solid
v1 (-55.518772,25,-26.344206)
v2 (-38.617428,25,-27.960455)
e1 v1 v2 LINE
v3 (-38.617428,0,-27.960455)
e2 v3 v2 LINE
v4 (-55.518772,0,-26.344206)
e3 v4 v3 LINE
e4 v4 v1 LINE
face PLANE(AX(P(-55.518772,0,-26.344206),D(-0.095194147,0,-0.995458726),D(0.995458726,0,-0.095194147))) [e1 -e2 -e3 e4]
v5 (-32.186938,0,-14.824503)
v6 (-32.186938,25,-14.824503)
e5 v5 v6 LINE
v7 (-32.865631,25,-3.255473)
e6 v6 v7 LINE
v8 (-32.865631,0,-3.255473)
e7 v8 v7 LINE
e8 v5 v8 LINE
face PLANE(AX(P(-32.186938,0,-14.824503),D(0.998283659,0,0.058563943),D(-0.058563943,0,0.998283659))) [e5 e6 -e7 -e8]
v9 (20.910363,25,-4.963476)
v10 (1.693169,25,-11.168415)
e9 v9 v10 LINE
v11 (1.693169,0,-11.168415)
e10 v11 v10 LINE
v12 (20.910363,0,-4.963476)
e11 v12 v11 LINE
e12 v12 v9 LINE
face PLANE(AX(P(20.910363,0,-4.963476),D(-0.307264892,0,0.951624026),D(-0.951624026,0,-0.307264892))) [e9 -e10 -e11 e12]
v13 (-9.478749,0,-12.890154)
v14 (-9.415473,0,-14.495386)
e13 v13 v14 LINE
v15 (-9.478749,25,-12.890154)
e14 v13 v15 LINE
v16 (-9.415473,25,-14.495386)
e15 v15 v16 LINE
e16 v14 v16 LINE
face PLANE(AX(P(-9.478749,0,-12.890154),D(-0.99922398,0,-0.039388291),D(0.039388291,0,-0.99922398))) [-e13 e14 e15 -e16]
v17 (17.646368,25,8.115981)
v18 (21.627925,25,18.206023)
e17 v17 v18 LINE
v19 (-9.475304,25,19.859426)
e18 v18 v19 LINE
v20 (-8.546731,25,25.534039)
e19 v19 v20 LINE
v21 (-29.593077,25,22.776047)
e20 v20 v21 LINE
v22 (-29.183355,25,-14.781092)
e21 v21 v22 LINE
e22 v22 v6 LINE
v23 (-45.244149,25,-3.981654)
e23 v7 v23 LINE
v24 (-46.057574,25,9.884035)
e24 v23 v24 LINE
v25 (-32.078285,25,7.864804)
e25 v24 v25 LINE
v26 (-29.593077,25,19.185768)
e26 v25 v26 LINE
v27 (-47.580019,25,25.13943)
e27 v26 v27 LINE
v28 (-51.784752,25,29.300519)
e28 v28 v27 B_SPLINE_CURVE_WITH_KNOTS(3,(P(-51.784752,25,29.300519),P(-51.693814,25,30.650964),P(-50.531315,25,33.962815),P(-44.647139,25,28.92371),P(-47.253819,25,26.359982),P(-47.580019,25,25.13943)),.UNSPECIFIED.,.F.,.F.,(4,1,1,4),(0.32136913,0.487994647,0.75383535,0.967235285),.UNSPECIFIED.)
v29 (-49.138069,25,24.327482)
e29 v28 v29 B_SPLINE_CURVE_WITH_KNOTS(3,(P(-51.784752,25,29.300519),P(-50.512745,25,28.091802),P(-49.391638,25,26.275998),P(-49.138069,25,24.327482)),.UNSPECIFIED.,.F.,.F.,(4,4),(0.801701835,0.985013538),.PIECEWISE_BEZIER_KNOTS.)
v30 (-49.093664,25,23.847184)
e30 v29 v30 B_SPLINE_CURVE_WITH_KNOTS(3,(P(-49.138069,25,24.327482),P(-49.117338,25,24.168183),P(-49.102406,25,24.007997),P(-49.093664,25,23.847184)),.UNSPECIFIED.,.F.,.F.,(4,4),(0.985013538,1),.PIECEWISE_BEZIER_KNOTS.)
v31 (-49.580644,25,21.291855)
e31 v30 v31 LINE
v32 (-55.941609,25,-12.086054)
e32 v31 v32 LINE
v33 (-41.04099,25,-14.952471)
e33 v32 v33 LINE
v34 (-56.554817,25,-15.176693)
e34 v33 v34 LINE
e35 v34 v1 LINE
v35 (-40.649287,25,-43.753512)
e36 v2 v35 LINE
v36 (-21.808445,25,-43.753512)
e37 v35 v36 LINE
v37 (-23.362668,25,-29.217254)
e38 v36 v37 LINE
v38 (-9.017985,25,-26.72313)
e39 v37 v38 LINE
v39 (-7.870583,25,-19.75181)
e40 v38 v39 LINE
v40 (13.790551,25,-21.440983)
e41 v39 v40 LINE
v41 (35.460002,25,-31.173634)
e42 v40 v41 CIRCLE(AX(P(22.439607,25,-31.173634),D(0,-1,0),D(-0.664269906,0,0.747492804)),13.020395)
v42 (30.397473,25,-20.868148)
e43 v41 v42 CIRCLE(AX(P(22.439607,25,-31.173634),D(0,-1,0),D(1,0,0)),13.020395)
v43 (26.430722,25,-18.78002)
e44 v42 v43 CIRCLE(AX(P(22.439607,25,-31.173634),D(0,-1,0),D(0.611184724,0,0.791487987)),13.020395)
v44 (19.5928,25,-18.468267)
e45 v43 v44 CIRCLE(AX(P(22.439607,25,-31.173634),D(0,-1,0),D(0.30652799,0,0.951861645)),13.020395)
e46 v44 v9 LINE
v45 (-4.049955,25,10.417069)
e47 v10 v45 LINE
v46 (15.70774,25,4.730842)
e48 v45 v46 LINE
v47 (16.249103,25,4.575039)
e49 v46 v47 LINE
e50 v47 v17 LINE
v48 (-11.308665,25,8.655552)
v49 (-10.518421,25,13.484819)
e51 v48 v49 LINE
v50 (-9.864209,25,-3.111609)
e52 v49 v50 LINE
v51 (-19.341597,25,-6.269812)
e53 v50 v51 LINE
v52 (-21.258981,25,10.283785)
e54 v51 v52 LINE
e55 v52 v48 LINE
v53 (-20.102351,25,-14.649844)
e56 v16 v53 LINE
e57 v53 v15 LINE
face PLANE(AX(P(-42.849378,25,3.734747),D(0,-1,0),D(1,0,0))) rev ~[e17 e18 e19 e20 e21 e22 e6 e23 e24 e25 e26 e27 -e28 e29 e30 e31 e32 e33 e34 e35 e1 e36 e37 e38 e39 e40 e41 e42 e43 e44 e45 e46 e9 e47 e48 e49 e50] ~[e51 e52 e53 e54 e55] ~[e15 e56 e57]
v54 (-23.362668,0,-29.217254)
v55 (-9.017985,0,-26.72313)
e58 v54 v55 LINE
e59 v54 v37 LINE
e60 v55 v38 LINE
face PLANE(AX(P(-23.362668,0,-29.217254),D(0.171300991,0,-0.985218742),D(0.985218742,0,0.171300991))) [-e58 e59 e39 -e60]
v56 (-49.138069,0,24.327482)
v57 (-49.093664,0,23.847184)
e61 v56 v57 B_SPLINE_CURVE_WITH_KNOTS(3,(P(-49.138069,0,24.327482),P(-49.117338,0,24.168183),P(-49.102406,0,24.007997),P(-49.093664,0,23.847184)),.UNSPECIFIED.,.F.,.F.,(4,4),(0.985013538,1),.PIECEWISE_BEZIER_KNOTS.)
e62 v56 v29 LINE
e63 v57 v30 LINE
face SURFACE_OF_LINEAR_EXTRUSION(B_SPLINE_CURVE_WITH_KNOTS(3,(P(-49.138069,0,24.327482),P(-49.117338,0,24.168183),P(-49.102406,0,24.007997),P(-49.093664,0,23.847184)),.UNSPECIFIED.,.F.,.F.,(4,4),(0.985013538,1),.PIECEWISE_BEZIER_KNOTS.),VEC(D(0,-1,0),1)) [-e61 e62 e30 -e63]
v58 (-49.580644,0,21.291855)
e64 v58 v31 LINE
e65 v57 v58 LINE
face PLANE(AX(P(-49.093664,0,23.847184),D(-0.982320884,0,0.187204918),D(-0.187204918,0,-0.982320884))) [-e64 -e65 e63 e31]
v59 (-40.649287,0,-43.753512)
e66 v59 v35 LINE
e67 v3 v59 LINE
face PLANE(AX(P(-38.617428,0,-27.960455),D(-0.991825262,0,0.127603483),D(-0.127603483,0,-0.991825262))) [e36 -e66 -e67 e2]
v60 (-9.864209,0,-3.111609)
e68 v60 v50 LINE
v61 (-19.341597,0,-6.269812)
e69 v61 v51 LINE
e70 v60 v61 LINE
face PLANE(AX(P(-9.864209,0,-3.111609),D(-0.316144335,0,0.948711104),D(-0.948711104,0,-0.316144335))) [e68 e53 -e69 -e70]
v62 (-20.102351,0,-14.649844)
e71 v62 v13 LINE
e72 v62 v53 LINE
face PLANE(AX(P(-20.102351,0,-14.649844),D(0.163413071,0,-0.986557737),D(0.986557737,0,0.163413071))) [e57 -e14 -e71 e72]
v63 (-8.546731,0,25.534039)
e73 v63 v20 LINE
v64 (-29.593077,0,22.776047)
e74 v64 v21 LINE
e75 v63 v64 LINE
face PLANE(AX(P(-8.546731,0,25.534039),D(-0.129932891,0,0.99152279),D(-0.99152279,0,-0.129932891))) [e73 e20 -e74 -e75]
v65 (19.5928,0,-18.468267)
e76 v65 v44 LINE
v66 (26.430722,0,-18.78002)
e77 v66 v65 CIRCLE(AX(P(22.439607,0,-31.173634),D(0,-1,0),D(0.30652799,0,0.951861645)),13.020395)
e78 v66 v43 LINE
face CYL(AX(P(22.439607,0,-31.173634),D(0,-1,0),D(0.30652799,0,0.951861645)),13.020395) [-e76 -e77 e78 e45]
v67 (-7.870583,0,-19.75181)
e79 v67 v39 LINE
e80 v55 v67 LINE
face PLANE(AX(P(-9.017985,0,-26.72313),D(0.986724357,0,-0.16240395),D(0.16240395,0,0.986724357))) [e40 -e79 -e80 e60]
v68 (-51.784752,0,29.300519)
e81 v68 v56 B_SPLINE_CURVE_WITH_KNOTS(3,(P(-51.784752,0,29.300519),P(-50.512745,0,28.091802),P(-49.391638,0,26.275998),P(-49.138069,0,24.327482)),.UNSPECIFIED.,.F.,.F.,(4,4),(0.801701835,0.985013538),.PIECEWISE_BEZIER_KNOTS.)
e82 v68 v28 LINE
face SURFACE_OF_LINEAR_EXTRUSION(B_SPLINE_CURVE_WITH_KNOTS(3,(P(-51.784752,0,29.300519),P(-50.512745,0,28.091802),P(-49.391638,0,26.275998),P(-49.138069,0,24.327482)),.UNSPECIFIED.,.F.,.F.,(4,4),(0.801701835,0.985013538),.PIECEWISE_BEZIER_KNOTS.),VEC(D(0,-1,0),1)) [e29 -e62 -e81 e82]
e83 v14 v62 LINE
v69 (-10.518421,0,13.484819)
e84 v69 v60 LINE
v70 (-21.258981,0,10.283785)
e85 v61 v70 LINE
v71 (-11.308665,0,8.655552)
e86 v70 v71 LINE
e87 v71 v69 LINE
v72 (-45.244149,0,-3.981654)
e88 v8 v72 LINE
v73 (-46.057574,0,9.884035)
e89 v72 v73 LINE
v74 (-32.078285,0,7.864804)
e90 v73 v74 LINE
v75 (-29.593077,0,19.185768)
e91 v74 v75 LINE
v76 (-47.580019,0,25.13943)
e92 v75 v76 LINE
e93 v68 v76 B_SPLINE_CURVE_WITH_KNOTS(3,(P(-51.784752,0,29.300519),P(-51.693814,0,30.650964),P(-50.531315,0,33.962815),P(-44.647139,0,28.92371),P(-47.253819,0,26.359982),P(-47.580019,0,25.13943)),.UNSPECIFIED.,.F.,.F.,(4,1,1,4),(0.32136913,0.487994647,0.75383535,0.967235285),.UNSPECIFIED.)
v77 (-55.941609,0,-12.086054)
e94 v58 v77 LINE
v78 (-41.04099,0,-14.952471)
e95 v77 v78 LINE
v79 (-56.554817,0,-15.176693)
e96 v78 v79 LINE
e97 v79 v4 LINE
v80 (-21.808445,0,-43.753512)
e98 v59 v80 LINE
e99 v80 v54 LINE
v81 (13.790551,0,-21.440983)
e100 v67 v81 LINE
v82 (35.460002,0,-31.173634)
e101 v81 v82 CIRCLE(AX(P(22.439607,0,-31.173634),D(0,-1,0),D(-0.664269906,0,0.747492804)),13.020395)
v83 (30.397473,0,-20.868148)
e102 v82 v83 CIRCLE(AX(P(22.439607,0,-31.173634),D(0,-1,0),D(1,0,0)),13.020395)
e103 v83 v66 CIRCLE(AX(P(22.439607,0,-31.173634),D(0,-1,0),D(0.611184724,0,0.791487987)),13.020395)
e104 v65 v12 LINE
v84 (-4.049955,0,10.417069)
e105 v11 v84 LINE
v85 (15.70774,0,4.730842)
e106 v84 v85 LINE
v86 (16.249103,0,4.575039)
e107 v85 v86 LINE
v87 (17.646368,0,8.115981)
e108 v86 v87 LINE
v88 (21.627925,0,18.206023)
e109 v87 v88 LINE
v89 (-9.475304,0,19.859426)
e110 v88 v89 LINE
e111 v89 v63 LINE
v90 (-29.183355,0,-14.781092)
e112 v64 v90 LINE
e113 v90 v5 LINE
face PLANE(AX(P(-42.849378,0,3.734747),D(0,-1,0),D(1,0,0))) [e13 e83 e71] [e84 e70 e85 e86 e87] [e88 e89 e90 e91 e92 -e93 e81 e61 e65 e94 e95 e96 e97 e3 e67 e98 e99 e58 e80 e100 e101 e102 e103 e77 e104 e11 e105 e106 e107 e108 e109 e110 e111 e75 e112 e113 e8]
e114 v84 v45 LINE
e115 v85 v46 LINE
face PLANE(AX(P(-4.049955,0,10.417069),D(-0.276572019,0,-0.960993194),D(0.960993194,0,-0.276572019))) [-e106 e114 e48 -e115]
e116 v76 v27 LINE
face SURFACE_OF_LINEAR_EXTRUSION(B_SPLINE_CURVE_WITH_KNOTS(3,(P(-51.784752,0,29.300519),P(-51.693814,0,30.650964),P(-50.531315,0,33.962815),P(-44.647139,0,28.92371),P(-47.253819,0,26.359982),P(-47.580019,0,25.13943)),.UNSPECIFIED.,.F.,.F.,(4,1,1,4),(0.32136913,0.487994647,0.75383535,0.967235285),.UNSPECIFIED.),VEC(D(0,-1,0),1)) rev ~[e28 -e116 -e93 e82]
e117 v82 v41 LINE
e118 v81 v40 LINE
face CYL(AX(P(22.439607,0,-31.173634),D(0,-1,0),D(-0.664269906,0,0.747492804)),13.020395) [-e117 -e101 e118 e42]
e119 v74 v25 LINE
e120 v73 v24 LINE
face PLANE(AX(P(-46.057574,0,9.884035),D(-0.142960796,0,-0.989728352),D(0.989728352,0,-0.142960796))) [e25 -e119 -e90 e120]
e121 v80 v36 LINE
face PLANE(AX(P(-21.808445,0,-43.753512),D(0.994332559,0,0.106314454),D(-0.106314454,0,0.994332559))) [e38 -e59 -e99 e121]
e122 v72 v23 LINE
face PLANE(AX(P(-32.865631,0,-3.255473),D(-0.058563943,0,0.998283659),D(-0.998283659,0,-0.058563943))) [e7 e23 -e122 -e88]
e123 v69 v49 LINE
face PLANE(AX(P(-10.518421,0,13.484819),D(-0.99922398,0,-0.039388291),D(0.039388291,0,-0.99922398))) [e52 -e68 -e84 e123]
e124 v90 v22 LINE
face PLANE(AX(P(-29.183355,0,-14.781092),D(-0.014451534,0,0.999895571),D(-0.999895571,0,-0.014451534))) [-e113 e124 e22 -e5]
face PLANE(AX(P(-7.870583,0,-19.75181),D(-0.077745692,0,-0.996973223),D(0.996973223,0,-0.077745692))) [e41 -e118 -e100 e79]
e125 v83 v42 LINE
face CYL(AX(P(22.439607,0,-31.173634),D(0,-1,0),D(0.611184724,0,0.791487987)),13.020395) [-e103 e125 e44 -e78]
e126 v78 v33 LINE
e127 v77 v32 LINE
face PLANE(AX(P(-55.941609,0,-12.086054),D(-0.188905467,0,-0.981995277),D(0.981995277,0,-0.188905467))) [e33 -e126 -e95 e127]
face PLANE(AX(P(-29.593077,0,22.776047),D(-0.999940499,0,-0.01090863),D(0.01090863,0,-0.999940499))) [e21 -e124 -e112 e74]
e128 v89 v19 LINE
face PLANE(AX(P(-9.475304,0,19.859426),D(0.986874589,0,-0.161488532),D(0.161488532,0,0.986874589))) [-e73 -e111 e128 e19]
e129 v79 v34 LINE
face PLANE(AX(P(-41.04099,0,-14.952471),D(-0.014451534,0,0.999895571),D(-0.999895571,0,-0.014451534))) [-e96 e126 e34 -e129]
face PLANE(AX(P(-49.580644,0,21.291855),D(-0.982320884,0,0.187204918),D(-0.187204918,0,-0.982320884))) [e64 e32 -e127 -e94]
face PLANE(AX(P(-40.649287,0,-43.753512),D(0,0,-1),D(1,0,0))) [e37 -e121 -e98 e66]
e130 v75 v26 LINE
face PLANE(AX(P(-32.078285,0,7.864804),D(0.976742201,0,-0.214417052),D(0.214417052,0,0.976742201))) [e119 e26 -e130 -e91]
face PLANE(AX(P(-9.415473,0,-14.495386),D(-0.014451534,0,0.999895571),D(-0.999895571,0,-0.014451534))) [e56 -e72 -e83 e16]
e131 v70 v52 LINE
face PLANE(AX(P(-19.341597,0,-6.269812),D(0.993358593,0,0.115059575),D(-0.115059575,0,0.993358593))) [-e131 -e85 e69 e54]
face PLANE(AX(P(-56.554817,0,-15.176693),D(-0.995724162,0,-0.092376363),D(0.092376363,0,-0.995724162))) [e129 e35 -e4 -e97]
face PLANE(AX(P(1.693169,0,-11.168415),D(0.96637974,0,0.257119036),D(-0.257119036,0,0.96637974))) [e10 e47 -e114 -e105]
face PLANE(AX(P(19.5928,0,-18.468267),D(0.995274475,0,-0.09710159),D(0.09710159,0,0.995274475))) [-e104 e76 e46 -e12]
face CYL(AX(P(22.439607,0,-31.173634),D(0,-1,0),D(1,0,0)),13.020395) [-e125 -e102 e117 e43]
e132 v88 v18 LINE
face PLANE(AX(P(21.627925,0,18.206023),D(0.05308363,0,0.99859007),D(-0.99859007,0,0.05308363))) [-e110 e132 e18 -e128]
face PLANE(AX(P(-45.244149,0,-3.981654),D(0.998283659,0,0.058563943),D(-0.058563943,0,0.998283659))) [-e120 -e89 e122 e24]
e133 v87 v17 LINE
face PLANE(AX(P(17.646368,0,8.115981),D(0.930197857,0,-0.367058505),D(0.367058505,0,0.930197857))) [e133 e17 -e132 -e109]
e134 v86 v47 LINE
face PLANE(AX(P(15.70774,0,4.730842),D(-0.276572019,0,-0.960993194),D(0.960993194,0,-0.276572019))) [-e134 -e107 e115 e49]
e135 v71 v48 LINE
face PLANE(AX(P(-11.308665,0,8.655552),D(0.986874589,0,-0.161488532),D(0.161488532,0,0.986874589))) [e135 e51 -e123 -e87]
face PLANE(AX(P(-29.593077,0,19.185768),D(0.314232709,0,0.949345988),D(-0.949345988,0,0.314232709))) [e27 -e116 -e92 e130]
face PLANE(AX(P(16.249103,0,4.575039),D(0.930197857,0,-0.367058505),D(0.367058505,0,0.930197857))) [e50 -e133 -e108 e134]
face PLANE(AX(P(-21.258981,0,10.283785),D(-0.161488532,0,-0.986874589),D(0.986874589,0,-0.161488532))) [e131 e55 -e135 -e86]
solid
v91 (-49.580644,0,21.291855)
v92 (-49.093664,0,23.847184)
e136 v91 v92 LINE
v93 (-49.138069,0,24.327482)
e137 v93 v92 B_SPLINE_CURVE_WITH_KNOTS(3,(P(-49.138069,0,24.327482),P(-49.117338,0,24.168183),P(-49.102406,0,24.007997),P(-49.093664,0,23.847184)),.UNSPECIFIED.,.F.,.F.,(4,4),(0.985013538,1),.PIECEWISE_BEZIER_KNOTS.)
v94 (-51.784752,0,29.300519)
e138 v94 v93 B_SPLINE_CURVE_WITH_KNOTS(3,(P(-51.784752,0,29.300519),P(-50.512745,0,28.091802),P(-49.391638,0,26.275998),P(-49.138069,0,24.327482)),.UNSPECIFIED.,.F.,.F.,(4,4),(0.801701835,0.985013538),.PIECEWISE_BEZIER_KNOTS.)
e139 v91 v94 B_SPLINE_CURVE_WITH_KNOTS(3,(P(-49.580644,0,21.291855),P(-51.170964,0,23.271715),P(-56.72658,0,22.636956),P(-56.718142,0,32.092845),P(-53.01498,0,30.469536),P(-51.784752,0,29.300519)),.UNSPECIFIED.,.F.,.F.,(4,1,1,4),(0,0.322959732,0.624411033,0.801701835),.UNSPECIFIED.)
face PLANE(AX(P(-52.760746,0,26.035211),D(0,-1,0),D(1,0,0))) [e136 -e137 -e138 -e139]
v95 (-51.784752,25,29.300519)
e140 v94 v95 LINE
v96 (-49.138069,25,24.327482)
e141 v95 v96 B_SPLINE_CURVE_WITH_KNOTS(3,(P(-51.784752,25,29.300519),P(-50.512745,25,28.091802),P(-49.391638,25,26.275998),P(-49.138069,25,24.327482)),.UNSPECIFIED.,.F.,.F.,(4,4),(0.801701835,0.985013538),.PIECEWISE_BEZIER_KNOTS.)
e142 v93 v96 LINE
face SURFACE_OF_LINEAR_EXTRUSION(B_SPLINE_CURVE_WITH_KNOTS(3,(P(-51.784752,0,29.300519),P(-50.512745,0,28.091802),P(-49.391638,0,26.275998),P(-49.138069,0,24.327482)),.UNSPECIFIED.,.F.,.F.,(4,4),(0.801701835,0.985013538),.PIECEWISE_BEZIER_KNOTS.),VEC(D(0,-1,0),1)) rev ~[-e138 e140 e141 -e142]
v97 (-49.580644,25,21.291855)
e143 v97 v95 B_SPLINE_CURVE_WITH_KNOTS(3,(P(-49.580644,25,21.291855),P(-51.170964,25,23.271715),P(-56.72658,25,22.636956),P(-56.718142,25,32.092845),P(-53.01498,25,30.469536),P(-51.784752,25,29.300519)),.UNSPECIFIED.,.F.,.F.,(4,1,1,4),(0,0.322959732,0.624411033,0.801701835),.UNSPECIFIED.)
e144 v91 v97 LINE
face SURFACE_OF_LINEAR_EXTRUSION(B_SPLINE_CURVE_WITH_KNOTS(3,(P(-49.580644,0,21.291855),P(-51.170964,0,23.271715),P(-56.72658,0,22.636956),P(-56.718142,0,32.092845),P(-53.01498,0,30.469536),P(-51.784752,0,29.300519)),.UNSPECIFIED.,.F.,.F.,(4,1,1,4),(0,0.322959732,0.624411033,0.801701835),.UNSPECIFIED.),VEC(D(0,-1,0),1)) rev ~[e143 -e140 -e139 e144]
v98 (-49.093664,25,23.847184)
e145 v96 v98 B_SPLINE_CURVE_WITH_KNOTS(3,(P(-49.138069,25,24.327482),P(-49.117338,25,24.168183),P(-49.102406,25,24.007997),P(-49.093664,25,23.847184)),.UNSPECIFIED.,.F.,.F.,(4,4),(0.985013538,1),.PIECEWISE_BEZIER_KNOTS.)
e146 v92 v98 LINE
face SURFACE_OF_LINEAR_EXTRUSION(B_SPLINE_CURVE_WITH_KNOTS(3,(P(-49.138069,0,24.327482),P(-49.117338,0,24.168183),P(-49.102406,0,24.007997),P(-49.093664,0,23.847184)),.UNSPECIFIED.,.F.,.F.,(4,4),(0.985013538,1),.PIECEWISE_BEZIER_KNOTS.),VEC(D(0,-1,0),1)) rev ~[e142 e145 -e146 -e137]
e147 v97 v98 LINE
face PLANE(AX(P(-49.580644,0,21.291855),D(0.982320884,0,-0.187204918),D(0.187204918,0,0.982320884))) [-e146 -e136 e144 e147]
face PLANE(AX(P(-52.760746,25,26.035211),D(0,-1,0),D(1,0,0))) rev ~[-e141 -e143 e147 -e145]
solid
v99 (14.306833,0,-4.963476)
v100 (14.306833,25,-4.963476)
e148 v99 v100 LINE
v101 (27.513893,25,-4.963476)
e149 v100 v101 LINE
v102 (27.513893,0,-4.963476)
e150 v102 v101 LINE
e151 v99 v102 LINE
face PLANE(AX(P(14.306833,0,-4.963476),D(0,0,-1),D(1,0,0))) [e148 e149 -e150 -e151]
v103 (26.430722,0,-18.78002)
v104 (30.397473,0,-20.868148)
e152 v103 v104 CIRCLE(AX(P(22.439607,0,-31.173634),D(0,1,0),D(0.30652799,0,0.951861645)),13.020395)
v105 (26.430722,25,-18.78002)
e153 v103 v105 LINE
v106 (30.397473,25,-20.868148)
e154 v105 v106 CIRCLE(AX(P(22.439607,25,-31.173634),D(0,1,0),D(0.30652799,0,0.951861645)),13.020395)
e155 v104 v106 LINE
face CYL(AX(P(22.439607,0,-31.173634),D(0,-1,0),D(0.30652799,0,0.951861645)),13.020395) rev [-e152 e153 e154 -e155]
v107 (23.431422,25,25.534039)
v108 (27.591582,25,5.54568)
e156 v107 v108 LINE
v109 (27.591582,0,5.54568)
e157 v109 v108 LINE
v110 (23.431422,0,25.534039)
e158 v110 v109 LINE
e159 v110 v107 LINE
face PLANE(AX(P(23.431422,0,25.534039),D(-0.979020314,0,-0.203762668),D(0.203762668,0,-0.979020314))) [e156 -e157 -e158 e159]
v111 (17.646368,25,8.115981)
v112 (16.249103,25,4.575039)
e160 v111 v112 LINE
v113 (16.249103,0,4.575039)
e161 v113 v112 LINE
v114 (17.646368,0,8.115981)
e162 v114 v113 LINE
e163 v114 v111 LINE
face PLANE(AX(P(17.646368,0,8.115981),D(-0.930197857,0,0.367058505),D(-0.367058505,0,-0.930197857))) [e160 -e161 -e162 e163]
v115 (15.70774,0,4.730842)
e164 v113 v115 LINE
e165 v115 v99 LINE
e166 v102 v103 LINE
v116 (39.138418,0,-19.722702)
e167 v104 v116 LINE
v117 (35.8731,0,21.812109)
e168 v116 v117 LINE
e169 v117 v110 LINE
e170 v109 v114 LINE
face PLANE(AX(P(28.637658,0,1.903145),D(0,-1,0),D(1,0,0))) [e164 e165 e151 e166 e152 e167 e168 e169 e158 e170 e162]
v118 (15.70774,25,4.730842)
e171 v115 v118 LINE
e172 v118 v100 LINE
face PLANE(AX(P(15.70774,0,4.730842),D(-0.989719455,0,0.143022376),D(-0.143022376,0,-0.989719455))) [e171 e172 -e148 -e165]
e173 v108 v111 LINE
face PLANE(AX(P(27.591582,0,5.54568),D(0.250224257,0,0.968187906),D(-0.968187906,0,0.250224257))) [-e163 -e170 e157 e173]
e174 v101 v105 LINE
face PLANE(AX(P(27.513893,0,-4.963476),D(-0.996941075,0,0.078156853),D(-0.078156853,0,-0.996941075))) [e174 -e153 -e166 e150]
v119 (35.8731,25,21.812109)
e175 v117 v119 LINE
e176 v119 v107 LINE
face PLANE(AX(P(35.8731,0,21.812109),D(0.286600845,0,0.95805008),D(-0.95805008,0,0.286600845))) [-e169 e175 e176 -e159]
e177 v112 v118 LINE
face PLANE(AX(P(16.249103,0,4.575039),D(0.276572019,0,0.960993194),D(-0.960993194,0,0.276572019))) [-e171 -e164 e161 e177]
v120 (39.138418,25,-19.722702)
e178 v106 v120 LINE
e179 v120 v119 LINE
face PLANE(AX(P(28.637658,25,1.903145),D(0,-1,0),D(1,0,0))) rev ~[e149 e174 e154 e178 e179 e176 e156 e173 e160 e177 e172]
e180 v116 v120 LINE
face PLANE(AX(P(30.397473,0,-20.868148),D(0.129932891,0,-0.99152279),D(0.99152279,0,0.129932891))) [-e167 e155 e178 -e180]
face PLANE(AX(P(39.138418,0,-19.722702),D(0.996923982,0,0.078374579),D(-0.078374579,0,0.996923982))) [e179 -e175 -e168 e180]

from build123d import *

# Parameters (mm, degrees)
F1_DEPTH = 25
F2_DEPTH = 25


# Not quite as in the source:
# - a feature names something its author has since deleted; it is built from what else it names


with BuildPart() as f1:
    # F0 (on Front) → F1 (new body)
    with BuildSketch(Plane.XZ):
        Polygon((-47.5800185116, 25.1394304663), (-48.7721934915, 25.5340393633), (-49.0936644847, 23.8471837339), (-49.580643877, 21.2918554258), (-55.9416088431, -12.0860535841), (-41.040990114, -14.9524709667), (-32.1869384028, -14.8245029716), (-32.865631272, -3.2554731287), (-45.2441488891, -3.9816542997), (-46.057574451, 9.8840352148), (-32.0782847703, 7.8648040071), (-29.5930765569, 19.1857680893), align=None)
        Polygon((-29.5930765569, 22.7760467678), (-29.1833552576, -14.7810920536), (-20.1023506464, -14.6498438984), (-9.4787493108, -12.890154367), (-9.8642086396, -3.1116086064), (-19.3415973336, -6.2698121183), (-21.2589813071, 10.2837849514), (-11.3086648334, 8.6555517214), (-10.5184212473, 13.4848191924), (-10.7724191621, 19.9283789843), (-9.4753039798, 19.8594261832), (-8.5467311277, 25.5340393633), align=None)
        Polygon((16.2491034716, 4.5750387944), (17.646368447, 8.115980815), (16.2491034716, 8.4770983085), (15.7077395213, 4.7308423127), align=None)
        Polygon((-32.0782847703, -16.6766177863), (-41.040990114, -14.9524709667), (-56.5548166633, -15.1766929775), (-55.5187724531, -26.3442061841), (-38.6174283922, -27.9604550451), (-40.6492874026, -43.7535122037), (-21.8084454536, -43.7535122037), (-23.3626682311, -29.2172543705), (-9.0179853141, -26.7231296748), (-7.8705830286, -19.7518104097), (-9.2123951763, -19.6471735835), (-9.415472877, -14.4953859884), (-20.1023506464, -14.6498438984), (-29.1684046388, -16.151541844), (-29.1833552576, -14.7810920536), (-32.1869384028, -14.8245029716), align=None)
        Polygon((-32.1869384028, -14.8245029716), (-41.040990114, -14.9524709667), (-32.0782847703, -16.6766177863), align=None)
        Polygon((-6.999686826, -14.4604705274), (-9.415472877, -14.4953859884), (-9.2123951763, -19.6471735835), (-7.8705830286, -19.7518104097), align=None)
        Polygon((-9.8642086396, -3.1116086064), (-9.4787493108, -12.890154367), (-9.0938955545, -12.8264073282), (-8.4957480431, -2.6555887889), align=None)
        Polygon((-20.1023506464, -14.6498438984), (-29.1833552576, -14.7810920536), (-29.1684046388, -16.151541844), align=None)
        with BuildLine():
            Line((19.2611534148, -21.8675900251), (13.7905507625, -21.4409829924))
            ThreePointArc((13.7905507625, -21.4409829924), (17.104977269, -43.0510244401), (35.4600015258, -31.1736341978))
            ThreePointArc((35.4600015258, -31.1736341978), (34.1260357026, -25.4327233148), (30.3974732406, -20.8681483563))
            Line((30.3974732406, -20.8681483563), (26.2241458364, -21.4150369417))
            Line((26.2241458364, -21.4150369417), (26.4307223653, -18.7800200512))
            ThreePointArc((26.4307223653, -18.7800200512), (23.0326147125, -18.1667508172), (19.5928003292, -18.4682666253))
            Line((19.5928003292, -18.4682666253), (19.2611534148, -21.8675900251))
        make_face()
        with BuildLine():
            ThreePointArc((19.5928003292, -18.4682666253), (16.5026063559, -19.5855930916), (13.7905507625, -21.4409829924))
            Line((13.7905507625, -21.4409829924), (19.2611534148, -21.8675900251))
            Line((19.2611534148, -21.8675900251), (19.5928003292, -18.4682666253))
        make_face()
        with BuildLine():
            ThreePointArc((30.3974732406, -20.8681483563), (28.504638765, -19.6520864201), (26.4307223653, -18.7800200512))
            Line((26.4307223653, -18.7800200512), (26.2241458364, -21.4150369417))
            Line((26.2241458364, -21.4150369417), (30.3974732406, -20.8681483563))
        make_face()
        Polygon((-10.5184212473, 13.4848191924), (-9.4753039798, 19.8594261832), (-10.7724191621, 19.9283789843), align=None)
        with BuildLine():
            Line((-9.0938955545, -12.8264073282), (-9.4787493108, -12.890154367))
            Line((-9.4787493108, -12.890154367), (-9.415472877, -14.4953859884))
            Line((-9.415472877, -14.4953859884), (-6.999686826, -14.4604705274))
            Line((-6.999686826, -14.4604705274), (-7.8705830286, -19.7518104097))
            Line((-7.8705830286, -19.7518104097), (13.7905507625, -21.4409829924))
            ThreePointArc((13.7905507625, -21.4409829924), (16.5026063559, -19.5855930916), (19.5928003292, -18.4682666253))
            Line((19.5928003292, -18.4682666253), (20.9103631787, -4.9634757452))
            Line((20.9103631787, -4.9634757452), (1.6931692371, -11.1684147269))
            Line((1.6931692371, -11.1684147269), (-4.0499549359, 10.4170693085))
            Line((-4.0499549359, 10.4170693085), (15.7077395213, 4.7308423127))
            Line((15.7077395213, 4.7308423127), (16.2491034716, 8.4770983085))
            Line((16.2491034716, 8.4770983085), (17.646368447, 8.115980815))
            Line((17.646368447, 8.115980815), (21.6279253364, 18.2060226798))
            Line((21.6279253364, 18.2060226798), (-9.4753039798, 19.8594261832))
            Line((-9.4753039798, 19.8594261832), (-10.5184212473, 13.4848191924))
            Line((-10.5184212473, 13.4848191924), (-9.8642086396, -3.1116086064))
            Line((-9.8642086396, -3.1116086064), (-8.4957480431, -2.6555887889))
            Line((-8.4957480431, -2.6555887889), (-9.0938955545, -12.8264073282))
        make_face()
        with BuildLine():
            Line((-49.0936644847, 23.8471837339), (-48.7721934915, 25.5340393633))
            Line((-48.7721934915, 25.5340393633), (-47.5800185116, 25.1394304663))
            add(Edge.make_bspline(
                [(-51.7847523134, 29.3005192438), (-51.6938141857, 30.6509644727), (-50.5313148062, 33.9628150244), (-44.6471394652, 28.923709997), (-47.2538191761, 26.3599821773), (-47.5800185116, 25.1394304663)],
                knots=[0.3213691305, 0.3213691305, 0.3213691305, 0.3213691305, 0.4879946472, 0.7538353497, 0.9672352852, 0.9672352852, 0.9672352852, 0.9672352852], degree=3))
            add(Edge.make_bspline(
                [(-51.7847523091, 29.300519245), (-50.5127452087, 28.0918020949), (-49.3916383719, 26.2759976867), (-49.1380687641, 24.327482226)],
                knots=[0.8017018355, 0.8017018355, 0.8017018355, 0.8017018355, 0.9850135384, 0.9850135384, 0.9850135384, 0.9850135384], degree=3))
            add(Edge.make_bspline(
                [(-49.1380687641, 24.327482226), (-49.117338439, 24.1681833284), (-49.1024064842, 24.0079974281), (-49.0936644847, 23.8471837339)],
                knots=[0.9850135384, 0.9850135384, 0.9850135384, 0.9850135384, 1, 1, 1, 1], degree=3))
        make_face()
    extrude(amount=-F1_DEPTH)


with BuildPart() as f2:
    # F0 (on Front) → F2 (new body)
    with BuildSketch(Plane.XZ):
        with BuildLine():
            Line((27.5915823877, 5.5456804112), (17.646368447, 8.115980815))
            Line((17.646368447, 8.115980815), (16.2491034716, 4.5750387944))
            Line((16.2491034716, 4.5750387944), (15.7077395213, 4.7308423127))
            Line((15.7077395213, 4.7308423127), (14.3068330362, -4.9634757452))
            Line((14.3068330362, -4.9634757452), (20.9103631787, -4.9634757452))
            Line((20.9103631787, -4.9634757452), (27.5138933212, -4.9634757452))
            Line((27.5138933212, -4.9634757452), (26.4307223653, -18.7800200512))
            ThreePointArc((26.4307223653, -18.7800200512), (28.504638765, -19.6520864201), (30.3974732406, -20.8681483563))
            Line((30.3974732406, -20.8681483563), (39.138417691, -19.7227019817))
            Line((39.138417691, -19.7227019817), (35.8731001616, 21.8121092767))
            Line((35.8731001616, 21.8121092767), (23.4314221889, 25.5340393633))
            Line((23.4314221889, 25.5340393633), (27.5915823877, 5.5456804112))
        make_face()
    extrude(amount=-F2_DEPTH)


with BuildPart() as f2b:
    # F0 (on Front) → F2, piece 2 (new body)
    with BuildSketch(Plane.XZ):
        with BuildLine():
            Line((-49.580643877, 21.2918554258), (-49.0936644847, 23.8471837339))
            add(Edge.make_bspline(
                [(-49.1380687641, 24.327482226), (-49.117338439, 24.1681833284), (-49.1024064842, 24.0079974281), (-49.0936644847, 23.8471837339)],
                knots=[0.9850135384, 0.9850135384, 0.9850135384, 0.9850135384, 1, 1, 1, 1], degree=3))
            add(Edge.make_bspline(
                [(-49.1380687641, 24.327482226), (-50.1405346839, 24.9125897933), (-51.5910596929, 25.7731299005), (-51.8409229757, 28.4663762406), (-51.7847523134, 29.3005192438)],
                knots=[0, 0, 0, 0, 0.218447882, 0.3213691305, 0.3213691305, 0.3213691305, 0.3213691305], degree=3))
            add(Edge.make_bspline(
                [(-49.580643877, 21.2918554258), (-51.170963794, 23.2717152685), (-56.7265800947, 22.6369556897), (-56.7181417239, 32.0928453298), (-53.0149801468, 30.4695359001), (-51.7847523091, 29.300519245)],
                knots=[0, 0, 0, 0, 0.3229597325, 0.6244110329, 0.8017018355, 0.8017018355, 0.8017018355, 0.8017018355], degree=3))
        make_face()
        with BuildLine():
            add(Edge.make_bspline(
                [(-51.7847523091, 29.300519245), (-50.5127452087, 28.0918020949), (-49.3916383719, 26.2759976867), (-49.1380687641, 24.327482226)],
                knots=[0.8017018355, 0.8017018355, 0.8017018355, 0.8017018355, 0.9850135384, 0.9850135384, 0.9850135384, 0.9850135384], degree=3))
            add(Edge.make_bspline(
                [(-49.1380687641, 24.327482226), (-50.1405346839, 24.9125897933), (-51.5910596929, 25.7731299005), (-51.8409229757, 28.4663762406), (-51.7847523134, 29.3005192438)],
                knots=[0, 0, 0, 0, 0.218447882, 0.3213691305, 0.3213691305, 0.3213691305, 0.3213691305], degree=3))
        make_face()
    extrude(amount=-F2_DEPTH)


solid = Compound([f1.part, f2.part, f2b.part])
